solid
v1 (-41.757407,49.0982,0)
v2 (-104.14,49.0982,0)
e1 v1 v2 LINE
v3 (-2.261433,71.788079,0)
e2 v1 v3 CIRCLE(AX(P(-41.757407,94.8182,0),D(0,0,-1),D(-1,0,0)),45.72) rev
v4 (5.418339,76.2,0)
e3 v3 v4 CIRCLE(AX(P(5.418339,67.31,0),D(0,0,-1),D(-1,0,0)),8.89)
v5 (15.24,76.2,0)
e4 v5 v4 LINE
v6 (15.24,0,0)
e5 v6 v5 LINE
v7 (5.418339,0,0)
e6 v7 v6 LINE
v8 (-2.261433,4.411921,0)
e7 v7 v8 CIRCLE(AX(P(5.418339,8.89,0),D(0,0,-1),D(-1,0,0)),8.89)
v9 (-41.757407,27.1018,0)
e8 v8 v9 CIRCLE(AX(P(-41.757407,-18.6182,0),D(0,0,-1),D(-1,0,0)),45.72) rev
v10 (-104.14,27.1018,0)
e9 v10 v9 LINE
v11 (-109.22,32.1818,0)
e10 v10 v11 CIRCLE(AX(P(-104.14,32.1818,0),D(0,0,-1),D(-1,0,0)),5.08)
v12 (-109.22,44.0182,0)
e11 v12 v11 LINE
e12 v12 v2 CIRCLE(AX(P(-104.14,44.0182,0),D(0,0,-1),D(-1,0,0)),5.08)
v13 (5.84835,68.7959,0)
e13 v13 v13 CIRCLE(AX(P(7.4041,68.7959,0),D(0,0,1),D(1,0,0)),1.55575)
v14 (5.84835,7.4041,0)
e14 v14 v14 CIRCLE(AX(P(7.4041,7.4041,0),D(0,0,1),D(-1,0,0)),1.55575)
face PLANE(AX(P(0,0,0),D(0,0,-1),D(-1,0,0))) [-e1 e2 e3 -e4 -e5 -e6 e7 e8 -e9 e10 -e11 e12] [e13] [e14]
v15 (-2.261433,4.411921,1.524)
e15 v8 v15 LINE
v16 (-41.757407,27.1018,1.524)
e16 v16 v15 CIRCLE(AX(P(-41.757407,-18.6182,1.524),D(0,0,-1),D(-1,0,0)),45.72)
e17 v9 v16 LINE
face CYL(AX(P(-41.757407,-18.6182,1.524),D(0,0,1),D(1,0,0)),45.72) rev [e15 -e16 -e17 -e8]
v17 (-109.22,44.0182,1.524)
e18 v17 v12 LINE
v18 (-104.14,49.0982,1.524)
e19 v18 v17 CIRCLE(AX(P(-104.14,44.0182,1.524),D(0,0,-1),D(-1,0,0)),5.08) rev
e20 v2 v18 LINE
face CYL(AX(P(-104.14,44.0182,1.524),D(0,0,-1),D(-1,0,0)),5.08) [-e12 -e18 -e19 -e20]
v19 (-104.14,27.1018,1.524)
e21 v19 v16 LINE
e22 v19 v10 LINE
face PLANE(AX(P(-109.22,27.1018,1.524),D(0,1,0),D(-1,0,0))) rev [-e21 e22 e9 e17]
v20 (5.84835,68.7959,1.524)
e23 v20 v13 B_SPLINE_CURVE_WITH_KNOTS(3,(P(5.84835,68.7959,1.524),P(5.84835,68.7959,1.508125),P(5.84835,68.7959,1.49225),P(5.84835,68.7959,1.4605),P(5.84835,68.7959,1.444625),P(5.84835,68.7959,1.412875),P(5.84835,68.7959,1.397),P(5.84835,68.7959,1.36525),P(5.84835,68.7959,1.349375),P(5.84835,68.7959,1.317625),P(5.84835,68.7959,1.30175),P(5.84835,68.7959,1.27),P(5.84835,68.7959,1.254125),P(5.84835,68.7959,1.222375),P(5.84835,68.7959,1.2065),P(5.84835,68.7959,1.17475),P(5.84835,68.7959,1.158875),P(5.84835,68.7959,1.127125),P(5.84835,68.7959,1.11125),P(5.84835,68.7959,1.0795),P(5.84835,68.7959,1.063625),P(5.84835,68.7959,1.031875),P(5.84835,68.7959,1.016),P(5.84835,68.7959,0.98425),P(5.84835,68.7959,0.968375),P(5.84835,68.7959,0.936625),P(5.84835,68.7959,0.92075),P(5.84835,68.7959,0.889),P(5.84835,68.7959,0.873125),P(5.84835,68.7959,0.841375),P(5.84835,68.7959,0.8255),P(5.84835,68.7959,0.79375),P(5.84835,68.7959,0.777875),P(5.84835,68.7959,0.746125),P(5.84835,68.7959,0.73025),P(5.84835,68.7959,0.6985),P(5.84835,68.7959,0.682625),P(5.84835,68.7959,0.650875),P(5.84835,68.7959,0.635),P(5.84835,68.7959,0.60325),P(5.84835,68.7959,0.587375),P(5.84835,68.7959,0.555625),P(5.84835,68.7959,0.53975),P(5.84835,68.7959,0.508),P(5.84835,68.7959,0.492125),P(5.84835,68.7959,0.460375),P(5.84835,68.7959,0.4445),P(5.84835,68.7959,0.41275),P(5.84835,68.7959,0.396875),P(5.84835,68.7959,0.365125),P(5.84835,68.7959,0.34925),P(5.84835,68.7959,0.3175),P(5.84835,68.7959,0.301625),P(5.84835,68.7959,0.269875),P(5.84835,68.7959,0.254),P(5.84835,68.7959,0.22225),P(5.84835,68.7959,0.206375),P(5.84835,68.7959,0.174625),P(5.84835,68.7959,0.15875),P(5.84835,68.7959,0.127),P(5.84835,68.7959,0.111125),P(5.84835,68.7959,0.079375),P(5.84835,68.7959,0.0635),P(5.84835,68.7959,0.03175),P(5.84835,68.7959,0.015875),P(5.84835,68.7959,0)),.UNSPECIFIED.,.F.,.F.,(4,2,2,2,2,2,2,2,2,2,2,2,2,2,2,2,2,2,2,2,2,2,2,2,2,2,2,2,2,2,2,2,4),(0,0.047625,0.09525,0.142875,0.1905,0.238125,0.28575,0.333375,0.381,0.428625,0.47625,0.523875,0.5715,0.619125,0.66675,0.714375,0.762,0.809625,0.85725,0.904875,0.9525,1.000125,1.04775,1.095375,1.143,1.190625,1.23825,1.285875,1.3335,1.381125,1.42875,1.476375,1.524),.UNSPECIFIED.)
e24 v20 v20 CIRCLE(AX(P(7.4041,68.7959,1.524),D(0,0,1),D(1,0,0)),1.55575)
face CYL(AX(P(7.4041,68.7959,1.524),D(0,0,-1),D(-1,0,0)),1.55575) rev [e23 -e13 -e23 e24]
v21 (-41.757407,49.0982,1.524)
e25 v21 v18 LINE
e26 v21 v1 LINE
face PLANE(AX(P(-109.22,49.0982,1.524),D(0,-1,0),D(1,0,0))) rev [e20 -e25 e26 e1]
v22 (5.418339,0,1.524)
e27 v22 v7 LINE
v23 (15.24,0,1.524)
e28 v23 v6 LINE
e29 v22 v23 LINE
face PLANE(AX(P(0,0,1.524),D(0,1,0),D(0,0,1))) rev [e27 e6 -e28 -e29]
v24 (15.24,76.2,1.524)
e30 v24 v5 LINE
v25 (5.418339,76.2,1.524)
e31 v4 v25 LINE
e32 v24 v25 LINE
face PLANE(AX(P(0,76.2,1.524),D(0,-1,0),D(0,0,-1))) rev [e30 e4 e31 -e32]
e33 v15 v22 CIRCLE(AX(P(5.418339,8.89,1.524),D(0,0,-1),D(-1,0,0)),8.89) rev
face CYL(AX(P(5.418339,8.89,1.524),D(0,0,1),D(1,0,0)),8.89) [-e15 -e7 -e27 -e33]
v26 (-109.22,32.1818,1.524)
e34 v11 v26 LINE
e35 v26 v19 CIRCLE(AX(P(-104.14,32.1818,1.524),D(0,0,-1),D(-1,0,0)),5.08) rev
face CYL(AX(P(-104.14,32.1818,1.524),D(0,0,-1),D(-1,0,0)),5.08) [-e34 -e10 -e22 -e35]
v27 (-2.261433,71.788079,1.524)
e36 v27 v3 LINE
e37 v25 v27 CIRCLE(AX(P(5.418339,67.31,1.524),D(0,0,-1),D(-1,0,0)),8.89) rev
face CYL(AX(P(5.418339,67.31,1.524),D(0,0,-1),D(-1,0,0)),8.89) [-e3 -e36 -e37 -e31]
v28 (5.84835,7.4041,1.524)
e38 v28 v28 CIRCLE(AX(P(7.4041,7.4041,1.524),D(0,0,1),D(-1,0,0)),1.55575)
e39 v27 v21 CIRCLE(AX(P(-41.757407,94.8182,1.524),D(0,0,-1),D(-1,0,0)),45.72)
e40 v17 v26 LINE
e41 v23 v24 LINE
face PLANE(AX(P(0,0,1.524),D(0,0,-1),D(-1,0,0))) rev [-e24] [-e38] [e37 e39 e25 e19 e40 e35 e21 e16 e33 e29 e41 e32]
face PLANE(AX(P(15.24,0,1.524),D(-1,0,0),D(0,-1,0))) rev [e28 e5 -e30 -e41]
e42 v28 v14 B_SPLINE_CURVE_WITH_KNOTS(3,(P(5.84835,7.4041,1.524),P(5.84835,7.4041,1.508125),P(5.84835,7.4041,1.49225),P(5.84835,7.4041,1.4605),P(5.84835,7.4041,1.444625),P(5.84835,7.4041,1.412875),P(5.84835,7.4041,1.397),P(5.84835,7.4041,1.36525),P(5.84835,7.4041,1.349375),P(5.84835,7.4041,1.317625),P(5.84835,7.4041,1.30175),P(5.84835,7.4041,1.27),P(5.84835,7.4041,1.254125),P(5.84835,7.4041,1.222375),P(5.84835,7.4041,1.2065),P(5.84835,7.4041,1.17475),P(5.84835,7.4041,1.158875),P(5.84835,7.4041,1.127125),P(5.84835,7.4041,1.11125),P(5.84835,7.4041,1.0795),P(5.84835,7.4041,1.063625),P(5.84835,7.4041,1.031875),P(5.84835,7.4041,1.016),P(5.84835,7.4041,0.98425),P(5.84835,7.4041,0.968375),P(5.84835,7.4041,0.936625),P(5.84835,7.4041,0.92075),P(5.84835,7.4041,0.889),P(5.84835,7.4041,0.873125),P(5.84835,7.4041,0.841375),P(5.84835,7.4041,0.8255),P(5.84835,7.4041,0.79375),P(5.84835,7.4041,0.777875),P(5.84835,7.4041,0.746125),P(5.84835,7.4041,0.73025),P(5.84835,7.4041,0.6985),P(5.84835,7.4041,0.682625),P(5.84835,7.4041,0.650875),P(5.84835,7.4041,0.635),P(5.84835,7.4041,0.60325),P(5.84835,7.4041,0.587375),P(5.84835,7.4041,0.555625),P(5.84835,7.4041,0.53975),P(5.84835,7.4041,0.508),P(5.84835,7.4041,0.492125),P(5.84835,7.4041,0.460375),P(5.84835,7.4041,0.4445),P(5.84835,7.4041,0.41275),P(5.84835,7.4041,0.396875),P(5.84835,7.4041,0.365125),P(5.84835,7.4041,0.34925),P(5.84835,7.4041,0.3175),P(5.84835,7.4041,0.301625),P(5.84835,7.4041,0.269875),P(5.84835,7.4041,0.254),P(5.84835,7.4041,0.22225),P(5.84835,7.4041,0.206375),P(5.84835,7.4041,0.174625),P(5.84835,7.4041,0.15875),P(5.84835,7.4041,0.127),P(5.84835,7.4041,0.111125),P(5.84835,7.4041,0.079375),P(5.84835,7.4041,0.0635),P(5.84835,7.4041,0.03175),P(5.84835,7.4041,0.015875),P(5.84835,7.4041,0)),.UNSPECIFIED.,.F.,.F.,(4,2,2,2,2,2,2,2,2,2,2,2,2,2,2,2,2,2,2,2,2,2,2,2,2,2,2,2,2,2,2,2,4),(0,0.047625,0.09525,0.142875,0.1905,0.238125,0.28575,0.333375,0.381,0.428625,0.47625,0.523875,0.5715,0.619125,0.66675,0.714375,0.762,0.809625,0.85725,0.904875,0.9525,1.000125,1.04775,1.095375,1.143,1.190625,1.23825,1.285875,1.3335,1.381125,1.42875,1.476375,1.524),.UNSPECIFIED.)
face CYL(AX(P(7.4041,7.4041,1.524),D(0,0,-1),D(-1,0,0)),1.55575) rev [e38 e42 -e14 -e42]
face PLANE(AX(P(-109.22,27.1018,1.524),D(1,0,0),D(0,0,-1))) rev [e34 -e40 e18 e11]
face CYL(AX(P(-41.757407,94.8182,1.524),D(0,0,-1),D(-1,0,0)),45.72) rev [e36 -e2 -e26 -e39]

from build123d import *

# Parameters (mm, degrees)
SKETCH1_R           = 1.55575
BOSS_EXTRUDE1_DEPTH = 1.524
FILLET1_R           = 5.08
FILLET2_R           = 45.72
FILLET3_R           = 8.89


with BuildPart() as part:
    # Sketch1 → Boss-Extrude1 (new body)
    with BuildSketch(Plane.XY):
        Polygon((0, 49.0982), (0, 76.2), (15.24, 76.2), (15.24, 0), (0, 0), (0, 27.1018), (-109.22, 27.1018), (-109.22, 49.0982), align=None)
        with Locations(Location((7.4041, 68.7959, 0), (0, 0, 180))):
            Circle(SKETCH1_R, mode=Mode.SUBTRACT)
        with Locations(Location((7.4041, 7.4041, 0), (0, 0, 180))):
            Circle(SKETCH1_R, mode=Mode.SUBTRACT)
    extrude(amount=BOSS_EXTRUDE1_DEPTH)

    # Fillet1
    fillet1_edges = [part.edges().sort_by_distance(p)[0] for p in [
        (-109.22, 27.1018, 0.762),
        (-109.22, 49.0982, 0.762),
    ]]
    fillet(fillet1_edges, radius=FILLET1_R)

    # Fillet2
    # the kernel refuses this fillet: 45.72 mm, written as the material it adds along each edge
    with BuildSketch(Plane(origin=(0, 27.1018, 0), x_dir=(-1, 0, 0), z_dir=(0, 0, 1))) as fillet2_piece_1:
        with BuildLine():
            CenterArc((41.757406873, 45.72), FILLET2_R, 204.030458178, 65.969541822)
            Line((0, 27.1018), (-0.835148137, 26.729436))
            ThreePointArc((-0.835148137, 26.729436), (-0.9144, 13.5509), (-0.9144, 0))
            Line((-0.9144, 0), (0, -0.9144))
            Line((0, -0.9144), (41.757406873, -0.9144))
            Line((41.757406873, -0.9144), (41.757406873, 0))
        make_face()
    extrude(amount=1.524)
    with BuildSketch(Plane(origin=(0, 49.0982, 0), x_dir=(-1, 0, 0), z_dir=(0, 0, 1))) as fillet2_piece_2:
        with BuildLine():
            CenterArc((41.757406873, -45.72), FILLET2_R, 90, 65.969541822)
            Line((0, -27.1018), (-0.835148137, -26.729436))
            ThreePointArc((-0.835148137, -26.729436), (-0.9144, -13.5509), (-0.9144, 0))
            Line((-0.9144, 0), (0, 0.9144))
            Line((0, 0.9144), (41.757406873, 0.9144))
            Line((41.757406873, 0.9144), (41.757406873, 0))
        make_face()
    extrude(amount=1.524)

    # Fillet3
    fillet3_edges = [part.edges().sort_by_distance(p)[0] for p in [
        (0, 76.2, 0.762),
        (0, 0, 0.762),
    ]]
    fillet(fillet3_edges, radius=FILLET3_R)


solid = part.part
